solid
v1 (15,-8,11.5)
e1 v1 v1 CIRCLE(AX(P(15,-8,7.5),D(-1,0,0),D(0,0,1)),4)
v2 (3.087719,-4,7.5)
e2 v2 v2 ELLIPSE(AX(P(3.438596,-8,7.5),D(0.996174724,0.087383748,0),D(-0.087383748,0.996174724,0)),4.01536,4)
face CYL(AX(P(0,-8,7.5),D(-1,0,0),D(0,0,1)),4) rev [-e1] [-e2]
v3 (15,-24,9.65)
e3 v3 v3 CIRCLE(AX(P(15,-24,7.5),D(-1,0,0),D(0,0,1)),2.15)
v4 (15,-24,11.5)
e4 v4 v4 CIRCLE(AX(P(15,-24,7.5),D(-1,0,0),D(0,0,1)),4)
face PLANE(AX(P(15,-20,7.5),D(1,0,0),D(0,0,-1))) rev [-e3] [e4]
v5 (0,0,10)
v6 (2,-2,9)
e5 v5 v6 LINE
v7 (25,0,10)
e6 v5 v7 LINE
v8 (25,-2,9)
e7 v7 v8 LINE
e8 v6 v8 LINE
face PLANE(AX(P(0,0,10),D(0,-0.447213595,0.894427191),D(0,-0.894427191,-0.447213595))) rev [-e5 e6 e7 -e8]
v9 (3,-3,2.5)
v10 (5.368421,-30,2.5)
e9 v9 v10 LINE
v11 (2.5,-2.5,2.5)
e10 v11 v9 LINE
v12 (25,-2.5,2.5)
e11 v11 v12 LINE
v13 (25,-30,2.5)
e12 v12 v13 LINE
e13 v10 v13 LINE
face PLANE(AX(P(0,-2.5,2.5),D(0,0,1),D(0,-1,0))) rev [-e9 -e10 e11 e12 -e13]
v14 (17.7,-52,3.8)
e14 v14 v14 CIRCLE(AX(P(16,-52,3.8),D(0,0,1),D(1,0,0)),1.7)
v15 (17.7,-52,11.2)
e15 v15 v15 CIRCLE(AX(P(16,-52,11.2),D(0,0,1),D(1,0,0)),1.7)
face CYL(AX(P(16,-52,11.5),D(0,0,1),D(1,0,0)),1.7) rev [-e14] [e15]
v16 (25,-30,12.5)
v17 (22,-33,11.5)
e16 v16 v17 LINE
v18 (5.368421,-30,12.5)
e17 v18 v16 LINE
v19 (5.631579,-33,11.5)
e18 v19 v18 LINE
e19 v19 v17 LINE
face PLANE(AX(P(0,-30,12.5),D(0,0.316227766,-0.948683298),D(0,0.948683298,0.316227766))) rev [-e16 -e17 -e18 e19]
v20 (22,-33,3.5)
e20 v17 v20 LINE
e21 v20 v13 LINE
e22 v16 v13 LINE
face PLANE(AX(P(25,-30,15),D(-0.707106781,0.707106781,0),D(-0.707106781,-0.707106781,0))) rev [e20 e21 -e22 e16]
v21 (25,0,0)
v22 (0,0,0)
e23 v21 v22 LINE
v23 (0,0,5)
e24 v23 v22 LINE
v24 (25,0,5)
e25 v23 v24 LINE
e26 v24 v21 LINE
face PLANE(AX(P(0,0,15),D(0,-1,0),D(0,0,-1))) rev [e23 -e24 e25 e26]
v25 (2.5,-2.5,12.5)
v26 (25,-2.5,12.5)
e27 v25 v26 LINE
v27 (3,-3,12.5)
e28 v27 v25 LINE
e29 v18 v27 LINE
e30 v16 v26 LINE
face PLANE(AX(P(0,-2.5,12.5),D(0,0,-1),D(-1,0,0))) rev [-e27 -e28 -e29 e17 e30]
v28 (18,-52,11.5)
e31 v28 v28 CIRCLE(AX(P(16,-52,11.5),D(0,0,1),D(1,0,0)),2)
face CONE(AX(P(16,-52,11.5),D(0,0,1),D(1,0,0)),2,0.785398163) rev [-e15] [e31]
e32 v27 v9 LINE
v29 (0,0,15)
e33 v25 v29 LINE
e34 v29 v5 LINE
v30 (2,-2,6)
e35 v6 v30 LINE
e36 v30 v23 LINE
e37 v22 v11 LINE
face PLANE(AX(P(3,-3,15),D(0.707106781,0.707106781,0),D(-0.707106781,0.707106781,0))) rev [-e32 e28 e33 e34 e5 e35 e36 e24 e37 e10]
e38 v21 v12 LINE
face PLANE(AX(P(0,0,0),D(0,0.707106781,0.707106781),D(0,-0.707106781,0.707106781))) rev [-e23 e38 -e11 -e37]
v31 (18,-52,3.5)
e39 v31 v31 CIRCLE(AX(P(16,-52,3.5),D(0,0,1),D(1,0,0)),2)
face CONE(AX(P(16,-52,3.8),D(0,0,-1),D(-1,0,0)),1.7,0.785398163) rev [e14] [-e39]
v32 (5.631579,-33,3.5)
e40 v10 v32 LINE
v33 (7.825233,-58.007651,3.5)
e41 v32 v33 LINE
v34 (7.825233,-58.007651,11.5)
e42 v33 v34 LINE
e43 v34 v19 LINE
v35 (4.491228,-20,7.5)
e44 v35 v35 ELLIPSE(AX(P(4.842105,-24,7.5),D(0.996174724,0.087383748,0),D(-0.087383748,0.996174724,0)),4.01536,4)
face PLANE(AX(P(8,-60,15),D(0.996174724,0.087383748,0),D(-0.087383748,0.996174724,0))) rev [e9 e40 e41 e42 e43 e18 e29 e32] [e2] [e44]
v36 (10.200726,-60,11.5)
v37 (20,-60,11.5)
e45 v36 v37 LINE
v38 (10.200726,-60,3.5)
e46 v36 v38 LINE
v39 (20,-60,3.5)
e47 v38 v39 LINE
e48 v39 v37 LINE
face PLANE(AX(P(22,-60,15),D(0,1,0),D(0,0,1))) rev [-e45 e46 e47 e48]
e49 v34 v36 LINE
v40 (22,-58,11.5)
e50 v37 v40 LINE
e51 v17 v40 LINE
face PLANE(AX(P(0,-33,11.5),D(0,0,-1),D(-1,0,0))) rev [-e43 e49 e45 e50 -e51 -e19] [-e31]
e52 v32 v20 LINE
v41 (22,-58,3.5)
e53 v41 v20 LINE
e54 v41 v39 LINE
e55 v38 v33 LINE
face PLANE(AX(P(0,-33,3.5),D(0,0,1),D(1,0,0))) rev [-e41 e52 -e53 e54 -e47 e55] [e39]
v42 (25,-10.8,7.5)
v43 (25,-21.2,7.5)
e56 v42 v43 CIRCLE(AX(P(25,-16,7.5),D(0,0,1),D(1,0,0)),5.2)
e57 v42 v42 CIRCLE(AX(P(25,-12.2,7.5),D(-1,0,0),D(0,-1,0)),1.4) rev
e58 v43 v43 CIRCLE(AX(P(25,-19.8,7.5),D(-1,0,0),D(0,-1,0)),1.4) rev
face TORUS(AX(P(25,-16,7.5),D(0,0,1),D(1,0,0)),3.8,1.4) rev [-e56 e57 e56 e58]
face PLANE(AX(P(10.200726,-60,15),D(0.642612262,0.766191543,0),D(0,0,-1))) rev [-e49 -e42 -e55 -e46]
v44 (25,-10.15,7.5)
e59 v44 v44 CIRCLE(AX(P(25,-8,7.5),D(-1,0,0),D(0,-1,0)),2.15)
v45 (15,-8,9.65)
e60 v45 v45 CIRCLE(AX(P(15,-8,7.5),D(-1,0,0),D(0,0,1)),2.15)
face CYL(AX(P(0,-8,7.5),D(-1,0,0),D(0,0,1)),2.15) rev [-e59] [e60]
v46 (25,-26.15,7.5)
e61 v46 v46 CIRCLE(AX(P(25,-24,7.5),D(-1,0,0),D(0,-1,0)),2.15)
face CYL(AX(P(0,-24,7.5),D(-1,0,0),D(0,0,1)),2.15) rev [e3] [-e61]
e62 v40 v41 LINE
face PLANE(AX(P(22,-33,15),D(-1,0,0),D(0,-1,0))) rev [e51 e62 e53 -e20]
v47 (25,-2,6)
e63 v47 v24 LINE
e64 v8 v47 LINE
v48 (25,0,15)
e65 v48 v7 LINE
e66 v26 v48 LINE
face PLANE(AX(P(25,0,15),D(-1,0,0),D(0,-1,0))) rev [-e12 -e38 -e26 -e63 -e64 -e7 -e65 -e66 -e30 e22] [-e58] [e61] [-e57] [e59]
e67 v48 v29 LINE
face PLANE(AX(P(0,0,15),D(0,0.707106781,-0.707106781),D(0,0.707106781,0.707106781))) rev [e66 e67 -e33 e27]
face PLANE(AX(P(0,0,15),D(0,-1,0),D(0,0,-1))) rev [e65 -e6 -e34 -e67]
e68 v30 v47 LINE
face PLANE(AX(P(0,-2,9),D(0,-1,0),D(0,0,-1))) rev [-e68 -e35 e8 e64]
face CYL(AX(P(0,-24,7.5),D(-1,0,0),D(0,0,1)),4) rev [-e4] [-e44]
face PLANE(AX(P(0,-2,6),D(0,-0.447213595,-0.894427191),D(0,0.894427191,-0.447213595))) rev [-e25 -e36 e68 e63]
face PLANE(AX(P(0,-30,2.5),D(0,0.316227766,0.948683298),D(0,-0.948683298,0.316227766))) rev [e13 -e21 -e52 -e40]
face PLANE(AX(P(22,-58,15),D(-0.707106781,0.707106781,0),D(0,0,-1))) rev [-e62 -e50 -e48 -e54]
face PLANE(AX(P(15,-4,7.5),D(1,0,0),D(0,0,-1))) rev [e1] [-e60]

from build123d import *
from OCP.BRepFilletAPI import BRepFilletAPI_MakeChamfer

# Parameters (mm, degrees)
BODY_DEPTH                 = 15
SHAPE_CUT_DEPTH            = 67.708320321
RAIL_CUTOUT_DEPTH          = 67.708320321
GUIDING_SCREWS_START       = 3.087719198
GUIDING_SCREWS_OUTLINE_R   = 4
GUIDING_SCREWS_DEPTH       = 11.912280802
GUIDING_SCREWS_START_2     = 15
GUIDING_SCREWS_2_OUTLINE_R = 2.15
GUIDING_SCREWS_2_DEPTH     = 10
SKETCH6_R                  = 1.4
TONG_TIP_CHAMFERS_SIZE     = 2
TONG_TIP_CHAMFERS_SIZE2    = 2.200726077


# Read off the part's stored shape, not the designer's step: guiding_screws
with BuildPart() as part:
    # Sketch1 → body (new body)
    with BuildSketch(Plane.XY):
        Polygon((0, 0), (25, 0), (25, -30), (22, -33), (22, -60), (8, -60), (3, -3), align=None)
    extrude(amount=BODY_DEPTH)

    # Sketch2 → shape_cut (cut, through all)
    with BuildSketch(Plane(origin=(25, 0, 0), x_dir=(0, 0, -1), z_dir=(1, 0, 0))):
        Polygon((-15, 0), (-12.5, -2.5), (-12.5, -30), (-11.5, -33), (-11.5, -60), (-15, -60), align=None)
        Polygon((0, 0), (-2.5, -2.5), (-2.5, -30), (-3.5, -33), (-3.5, -60), (0, -60), align=None)
    extrude(amount=-SHAPE_CUT_DEPTH, mode=Mode.SUBTRACT)

    # Sketch3 → rail_cutout (cut, through all)
    with BuildSketch(Plane(origin=(25, 0, 0), x_dir=(0, 0, -1), z_dir=(1, 0, 0))):
        Polygon((-10, 0), (-5, 0), (-6, -2), (-9, -2), align=None)
    extrude(amount=-RAIL_CUTOUT_DEPTH, mode=Mode.SUBTRACT)

    # guiding_screws outline → guiding_screws (cut)
    with BuildSketch(Plane.YZ.offset(GUIDING_SCREWS_START)):
        with Locations((-24, 7.5)):
            Circle(GUIDING_SCREWS_OUTLINE_R)
        with Locations((-8, 7.5)):
            Circle(GUIDING_SCREWS_OUTLINE_R)
    extrude(amount=GUIDING_SCREWS_DEPTH, mode=Mode.SUBTRACT)

    # guiding_screws 2 outline → guiding_screws 2 (cut)
    with BuildSketch(Plane.YZ.offset(GUIDING_SCREWS_START_2)):
        with Locations((-24, 7.5)):
            Circle(GUIDING_SCREWS_2_OUTLINE_R)
        with Locations((-8, 7.5)):
            Circle(GUIDING_SCREWS_2_OUTLINE_R)
    extrude(amount=GUIDING_SCREWS_2_DEPTH, mode=Mode.SUBTRACT)

    # Sketch6 → rope_connector_cutout (revolve, cut)
    with BuildSketch(Plane(origin=(25, 0, 0), x_dir=(0, 0, -1), z_dir=(1, 0, 0)), mode=Mode.PRIVATE) as rope_connector_cutout_sk:
        with Locations((-7.5, -12.2)):
            Circle(SKETCH6_R)
    revolve(rope_connector_cutout_sk.sketch.rotate(Axis((25, -16, 12.5), (0, 0, -1)), 270), axis=Axis((25, -16, 12.5), (0, 0, -1)), mode=Mode.SUBTRACT)

    # tong_tip_chamfers: one chamfer whose edges measure the first distance from different faces: ONE call of the kernel's chamfer builder (chamfer() names one face for all edges)
    tong_tip_chamfers_edges_1 = [part.edges().sort_by_distance(p)[0] for p in [
        (22, -60, 7.5),
    ]]
    tong_tip_chamfers_edges_2 = [part.edges().sort_by_distance(p)[0] for p in [
        (8, -60, 7.5),
    ]]
    tong_tip_chamfers_side_2 = [part.faces().sort_by_distance(p)[0] for p in [
        (5.65880617, -33.310390339, 7.5),
    ]]
    tong_tip_chamfers = BRepFilletAPI_MakeChamfer(part.part.solid().wrapped)
    for e in tong_tip_chamfers_edges_1:
        tong_tip_chamfers.Add(TONG_TIP_CHAMFERS_SIZE, e.wrapped)
    for e in tong_tip_chamfers_edges_2:
        tong_tip_chamfers.Add(TONG_TIP_CHAMFERS_SIZE, TONG_TIP_CHAMFERS_SIZE2, e.wrapped, tong_tip_chamfers_side_2[0].wrapped)  # the first distance lies on this face
    add(Compound.cast(tong_tip_chamfers.Shape()), mode=Mode.REPLACE)

    # Sketch9 → tong_tip_hole (revolve, cut)
    with BuildSketch(Plane(origin=(16, -52, 11.5), x_dir=(0, -1, 0), z_dir=(1, 0, 0))):
        Polygon((0, 0), (0, 8), (2, 8), (1.7, 7.7), (1.7, 0.3), (2, 0), align=None)
    revolve(axis=Axis((16, -52, 17.85), (0, 0, -1)), mode=Mode.SUBTRACT)


solid = part.part
